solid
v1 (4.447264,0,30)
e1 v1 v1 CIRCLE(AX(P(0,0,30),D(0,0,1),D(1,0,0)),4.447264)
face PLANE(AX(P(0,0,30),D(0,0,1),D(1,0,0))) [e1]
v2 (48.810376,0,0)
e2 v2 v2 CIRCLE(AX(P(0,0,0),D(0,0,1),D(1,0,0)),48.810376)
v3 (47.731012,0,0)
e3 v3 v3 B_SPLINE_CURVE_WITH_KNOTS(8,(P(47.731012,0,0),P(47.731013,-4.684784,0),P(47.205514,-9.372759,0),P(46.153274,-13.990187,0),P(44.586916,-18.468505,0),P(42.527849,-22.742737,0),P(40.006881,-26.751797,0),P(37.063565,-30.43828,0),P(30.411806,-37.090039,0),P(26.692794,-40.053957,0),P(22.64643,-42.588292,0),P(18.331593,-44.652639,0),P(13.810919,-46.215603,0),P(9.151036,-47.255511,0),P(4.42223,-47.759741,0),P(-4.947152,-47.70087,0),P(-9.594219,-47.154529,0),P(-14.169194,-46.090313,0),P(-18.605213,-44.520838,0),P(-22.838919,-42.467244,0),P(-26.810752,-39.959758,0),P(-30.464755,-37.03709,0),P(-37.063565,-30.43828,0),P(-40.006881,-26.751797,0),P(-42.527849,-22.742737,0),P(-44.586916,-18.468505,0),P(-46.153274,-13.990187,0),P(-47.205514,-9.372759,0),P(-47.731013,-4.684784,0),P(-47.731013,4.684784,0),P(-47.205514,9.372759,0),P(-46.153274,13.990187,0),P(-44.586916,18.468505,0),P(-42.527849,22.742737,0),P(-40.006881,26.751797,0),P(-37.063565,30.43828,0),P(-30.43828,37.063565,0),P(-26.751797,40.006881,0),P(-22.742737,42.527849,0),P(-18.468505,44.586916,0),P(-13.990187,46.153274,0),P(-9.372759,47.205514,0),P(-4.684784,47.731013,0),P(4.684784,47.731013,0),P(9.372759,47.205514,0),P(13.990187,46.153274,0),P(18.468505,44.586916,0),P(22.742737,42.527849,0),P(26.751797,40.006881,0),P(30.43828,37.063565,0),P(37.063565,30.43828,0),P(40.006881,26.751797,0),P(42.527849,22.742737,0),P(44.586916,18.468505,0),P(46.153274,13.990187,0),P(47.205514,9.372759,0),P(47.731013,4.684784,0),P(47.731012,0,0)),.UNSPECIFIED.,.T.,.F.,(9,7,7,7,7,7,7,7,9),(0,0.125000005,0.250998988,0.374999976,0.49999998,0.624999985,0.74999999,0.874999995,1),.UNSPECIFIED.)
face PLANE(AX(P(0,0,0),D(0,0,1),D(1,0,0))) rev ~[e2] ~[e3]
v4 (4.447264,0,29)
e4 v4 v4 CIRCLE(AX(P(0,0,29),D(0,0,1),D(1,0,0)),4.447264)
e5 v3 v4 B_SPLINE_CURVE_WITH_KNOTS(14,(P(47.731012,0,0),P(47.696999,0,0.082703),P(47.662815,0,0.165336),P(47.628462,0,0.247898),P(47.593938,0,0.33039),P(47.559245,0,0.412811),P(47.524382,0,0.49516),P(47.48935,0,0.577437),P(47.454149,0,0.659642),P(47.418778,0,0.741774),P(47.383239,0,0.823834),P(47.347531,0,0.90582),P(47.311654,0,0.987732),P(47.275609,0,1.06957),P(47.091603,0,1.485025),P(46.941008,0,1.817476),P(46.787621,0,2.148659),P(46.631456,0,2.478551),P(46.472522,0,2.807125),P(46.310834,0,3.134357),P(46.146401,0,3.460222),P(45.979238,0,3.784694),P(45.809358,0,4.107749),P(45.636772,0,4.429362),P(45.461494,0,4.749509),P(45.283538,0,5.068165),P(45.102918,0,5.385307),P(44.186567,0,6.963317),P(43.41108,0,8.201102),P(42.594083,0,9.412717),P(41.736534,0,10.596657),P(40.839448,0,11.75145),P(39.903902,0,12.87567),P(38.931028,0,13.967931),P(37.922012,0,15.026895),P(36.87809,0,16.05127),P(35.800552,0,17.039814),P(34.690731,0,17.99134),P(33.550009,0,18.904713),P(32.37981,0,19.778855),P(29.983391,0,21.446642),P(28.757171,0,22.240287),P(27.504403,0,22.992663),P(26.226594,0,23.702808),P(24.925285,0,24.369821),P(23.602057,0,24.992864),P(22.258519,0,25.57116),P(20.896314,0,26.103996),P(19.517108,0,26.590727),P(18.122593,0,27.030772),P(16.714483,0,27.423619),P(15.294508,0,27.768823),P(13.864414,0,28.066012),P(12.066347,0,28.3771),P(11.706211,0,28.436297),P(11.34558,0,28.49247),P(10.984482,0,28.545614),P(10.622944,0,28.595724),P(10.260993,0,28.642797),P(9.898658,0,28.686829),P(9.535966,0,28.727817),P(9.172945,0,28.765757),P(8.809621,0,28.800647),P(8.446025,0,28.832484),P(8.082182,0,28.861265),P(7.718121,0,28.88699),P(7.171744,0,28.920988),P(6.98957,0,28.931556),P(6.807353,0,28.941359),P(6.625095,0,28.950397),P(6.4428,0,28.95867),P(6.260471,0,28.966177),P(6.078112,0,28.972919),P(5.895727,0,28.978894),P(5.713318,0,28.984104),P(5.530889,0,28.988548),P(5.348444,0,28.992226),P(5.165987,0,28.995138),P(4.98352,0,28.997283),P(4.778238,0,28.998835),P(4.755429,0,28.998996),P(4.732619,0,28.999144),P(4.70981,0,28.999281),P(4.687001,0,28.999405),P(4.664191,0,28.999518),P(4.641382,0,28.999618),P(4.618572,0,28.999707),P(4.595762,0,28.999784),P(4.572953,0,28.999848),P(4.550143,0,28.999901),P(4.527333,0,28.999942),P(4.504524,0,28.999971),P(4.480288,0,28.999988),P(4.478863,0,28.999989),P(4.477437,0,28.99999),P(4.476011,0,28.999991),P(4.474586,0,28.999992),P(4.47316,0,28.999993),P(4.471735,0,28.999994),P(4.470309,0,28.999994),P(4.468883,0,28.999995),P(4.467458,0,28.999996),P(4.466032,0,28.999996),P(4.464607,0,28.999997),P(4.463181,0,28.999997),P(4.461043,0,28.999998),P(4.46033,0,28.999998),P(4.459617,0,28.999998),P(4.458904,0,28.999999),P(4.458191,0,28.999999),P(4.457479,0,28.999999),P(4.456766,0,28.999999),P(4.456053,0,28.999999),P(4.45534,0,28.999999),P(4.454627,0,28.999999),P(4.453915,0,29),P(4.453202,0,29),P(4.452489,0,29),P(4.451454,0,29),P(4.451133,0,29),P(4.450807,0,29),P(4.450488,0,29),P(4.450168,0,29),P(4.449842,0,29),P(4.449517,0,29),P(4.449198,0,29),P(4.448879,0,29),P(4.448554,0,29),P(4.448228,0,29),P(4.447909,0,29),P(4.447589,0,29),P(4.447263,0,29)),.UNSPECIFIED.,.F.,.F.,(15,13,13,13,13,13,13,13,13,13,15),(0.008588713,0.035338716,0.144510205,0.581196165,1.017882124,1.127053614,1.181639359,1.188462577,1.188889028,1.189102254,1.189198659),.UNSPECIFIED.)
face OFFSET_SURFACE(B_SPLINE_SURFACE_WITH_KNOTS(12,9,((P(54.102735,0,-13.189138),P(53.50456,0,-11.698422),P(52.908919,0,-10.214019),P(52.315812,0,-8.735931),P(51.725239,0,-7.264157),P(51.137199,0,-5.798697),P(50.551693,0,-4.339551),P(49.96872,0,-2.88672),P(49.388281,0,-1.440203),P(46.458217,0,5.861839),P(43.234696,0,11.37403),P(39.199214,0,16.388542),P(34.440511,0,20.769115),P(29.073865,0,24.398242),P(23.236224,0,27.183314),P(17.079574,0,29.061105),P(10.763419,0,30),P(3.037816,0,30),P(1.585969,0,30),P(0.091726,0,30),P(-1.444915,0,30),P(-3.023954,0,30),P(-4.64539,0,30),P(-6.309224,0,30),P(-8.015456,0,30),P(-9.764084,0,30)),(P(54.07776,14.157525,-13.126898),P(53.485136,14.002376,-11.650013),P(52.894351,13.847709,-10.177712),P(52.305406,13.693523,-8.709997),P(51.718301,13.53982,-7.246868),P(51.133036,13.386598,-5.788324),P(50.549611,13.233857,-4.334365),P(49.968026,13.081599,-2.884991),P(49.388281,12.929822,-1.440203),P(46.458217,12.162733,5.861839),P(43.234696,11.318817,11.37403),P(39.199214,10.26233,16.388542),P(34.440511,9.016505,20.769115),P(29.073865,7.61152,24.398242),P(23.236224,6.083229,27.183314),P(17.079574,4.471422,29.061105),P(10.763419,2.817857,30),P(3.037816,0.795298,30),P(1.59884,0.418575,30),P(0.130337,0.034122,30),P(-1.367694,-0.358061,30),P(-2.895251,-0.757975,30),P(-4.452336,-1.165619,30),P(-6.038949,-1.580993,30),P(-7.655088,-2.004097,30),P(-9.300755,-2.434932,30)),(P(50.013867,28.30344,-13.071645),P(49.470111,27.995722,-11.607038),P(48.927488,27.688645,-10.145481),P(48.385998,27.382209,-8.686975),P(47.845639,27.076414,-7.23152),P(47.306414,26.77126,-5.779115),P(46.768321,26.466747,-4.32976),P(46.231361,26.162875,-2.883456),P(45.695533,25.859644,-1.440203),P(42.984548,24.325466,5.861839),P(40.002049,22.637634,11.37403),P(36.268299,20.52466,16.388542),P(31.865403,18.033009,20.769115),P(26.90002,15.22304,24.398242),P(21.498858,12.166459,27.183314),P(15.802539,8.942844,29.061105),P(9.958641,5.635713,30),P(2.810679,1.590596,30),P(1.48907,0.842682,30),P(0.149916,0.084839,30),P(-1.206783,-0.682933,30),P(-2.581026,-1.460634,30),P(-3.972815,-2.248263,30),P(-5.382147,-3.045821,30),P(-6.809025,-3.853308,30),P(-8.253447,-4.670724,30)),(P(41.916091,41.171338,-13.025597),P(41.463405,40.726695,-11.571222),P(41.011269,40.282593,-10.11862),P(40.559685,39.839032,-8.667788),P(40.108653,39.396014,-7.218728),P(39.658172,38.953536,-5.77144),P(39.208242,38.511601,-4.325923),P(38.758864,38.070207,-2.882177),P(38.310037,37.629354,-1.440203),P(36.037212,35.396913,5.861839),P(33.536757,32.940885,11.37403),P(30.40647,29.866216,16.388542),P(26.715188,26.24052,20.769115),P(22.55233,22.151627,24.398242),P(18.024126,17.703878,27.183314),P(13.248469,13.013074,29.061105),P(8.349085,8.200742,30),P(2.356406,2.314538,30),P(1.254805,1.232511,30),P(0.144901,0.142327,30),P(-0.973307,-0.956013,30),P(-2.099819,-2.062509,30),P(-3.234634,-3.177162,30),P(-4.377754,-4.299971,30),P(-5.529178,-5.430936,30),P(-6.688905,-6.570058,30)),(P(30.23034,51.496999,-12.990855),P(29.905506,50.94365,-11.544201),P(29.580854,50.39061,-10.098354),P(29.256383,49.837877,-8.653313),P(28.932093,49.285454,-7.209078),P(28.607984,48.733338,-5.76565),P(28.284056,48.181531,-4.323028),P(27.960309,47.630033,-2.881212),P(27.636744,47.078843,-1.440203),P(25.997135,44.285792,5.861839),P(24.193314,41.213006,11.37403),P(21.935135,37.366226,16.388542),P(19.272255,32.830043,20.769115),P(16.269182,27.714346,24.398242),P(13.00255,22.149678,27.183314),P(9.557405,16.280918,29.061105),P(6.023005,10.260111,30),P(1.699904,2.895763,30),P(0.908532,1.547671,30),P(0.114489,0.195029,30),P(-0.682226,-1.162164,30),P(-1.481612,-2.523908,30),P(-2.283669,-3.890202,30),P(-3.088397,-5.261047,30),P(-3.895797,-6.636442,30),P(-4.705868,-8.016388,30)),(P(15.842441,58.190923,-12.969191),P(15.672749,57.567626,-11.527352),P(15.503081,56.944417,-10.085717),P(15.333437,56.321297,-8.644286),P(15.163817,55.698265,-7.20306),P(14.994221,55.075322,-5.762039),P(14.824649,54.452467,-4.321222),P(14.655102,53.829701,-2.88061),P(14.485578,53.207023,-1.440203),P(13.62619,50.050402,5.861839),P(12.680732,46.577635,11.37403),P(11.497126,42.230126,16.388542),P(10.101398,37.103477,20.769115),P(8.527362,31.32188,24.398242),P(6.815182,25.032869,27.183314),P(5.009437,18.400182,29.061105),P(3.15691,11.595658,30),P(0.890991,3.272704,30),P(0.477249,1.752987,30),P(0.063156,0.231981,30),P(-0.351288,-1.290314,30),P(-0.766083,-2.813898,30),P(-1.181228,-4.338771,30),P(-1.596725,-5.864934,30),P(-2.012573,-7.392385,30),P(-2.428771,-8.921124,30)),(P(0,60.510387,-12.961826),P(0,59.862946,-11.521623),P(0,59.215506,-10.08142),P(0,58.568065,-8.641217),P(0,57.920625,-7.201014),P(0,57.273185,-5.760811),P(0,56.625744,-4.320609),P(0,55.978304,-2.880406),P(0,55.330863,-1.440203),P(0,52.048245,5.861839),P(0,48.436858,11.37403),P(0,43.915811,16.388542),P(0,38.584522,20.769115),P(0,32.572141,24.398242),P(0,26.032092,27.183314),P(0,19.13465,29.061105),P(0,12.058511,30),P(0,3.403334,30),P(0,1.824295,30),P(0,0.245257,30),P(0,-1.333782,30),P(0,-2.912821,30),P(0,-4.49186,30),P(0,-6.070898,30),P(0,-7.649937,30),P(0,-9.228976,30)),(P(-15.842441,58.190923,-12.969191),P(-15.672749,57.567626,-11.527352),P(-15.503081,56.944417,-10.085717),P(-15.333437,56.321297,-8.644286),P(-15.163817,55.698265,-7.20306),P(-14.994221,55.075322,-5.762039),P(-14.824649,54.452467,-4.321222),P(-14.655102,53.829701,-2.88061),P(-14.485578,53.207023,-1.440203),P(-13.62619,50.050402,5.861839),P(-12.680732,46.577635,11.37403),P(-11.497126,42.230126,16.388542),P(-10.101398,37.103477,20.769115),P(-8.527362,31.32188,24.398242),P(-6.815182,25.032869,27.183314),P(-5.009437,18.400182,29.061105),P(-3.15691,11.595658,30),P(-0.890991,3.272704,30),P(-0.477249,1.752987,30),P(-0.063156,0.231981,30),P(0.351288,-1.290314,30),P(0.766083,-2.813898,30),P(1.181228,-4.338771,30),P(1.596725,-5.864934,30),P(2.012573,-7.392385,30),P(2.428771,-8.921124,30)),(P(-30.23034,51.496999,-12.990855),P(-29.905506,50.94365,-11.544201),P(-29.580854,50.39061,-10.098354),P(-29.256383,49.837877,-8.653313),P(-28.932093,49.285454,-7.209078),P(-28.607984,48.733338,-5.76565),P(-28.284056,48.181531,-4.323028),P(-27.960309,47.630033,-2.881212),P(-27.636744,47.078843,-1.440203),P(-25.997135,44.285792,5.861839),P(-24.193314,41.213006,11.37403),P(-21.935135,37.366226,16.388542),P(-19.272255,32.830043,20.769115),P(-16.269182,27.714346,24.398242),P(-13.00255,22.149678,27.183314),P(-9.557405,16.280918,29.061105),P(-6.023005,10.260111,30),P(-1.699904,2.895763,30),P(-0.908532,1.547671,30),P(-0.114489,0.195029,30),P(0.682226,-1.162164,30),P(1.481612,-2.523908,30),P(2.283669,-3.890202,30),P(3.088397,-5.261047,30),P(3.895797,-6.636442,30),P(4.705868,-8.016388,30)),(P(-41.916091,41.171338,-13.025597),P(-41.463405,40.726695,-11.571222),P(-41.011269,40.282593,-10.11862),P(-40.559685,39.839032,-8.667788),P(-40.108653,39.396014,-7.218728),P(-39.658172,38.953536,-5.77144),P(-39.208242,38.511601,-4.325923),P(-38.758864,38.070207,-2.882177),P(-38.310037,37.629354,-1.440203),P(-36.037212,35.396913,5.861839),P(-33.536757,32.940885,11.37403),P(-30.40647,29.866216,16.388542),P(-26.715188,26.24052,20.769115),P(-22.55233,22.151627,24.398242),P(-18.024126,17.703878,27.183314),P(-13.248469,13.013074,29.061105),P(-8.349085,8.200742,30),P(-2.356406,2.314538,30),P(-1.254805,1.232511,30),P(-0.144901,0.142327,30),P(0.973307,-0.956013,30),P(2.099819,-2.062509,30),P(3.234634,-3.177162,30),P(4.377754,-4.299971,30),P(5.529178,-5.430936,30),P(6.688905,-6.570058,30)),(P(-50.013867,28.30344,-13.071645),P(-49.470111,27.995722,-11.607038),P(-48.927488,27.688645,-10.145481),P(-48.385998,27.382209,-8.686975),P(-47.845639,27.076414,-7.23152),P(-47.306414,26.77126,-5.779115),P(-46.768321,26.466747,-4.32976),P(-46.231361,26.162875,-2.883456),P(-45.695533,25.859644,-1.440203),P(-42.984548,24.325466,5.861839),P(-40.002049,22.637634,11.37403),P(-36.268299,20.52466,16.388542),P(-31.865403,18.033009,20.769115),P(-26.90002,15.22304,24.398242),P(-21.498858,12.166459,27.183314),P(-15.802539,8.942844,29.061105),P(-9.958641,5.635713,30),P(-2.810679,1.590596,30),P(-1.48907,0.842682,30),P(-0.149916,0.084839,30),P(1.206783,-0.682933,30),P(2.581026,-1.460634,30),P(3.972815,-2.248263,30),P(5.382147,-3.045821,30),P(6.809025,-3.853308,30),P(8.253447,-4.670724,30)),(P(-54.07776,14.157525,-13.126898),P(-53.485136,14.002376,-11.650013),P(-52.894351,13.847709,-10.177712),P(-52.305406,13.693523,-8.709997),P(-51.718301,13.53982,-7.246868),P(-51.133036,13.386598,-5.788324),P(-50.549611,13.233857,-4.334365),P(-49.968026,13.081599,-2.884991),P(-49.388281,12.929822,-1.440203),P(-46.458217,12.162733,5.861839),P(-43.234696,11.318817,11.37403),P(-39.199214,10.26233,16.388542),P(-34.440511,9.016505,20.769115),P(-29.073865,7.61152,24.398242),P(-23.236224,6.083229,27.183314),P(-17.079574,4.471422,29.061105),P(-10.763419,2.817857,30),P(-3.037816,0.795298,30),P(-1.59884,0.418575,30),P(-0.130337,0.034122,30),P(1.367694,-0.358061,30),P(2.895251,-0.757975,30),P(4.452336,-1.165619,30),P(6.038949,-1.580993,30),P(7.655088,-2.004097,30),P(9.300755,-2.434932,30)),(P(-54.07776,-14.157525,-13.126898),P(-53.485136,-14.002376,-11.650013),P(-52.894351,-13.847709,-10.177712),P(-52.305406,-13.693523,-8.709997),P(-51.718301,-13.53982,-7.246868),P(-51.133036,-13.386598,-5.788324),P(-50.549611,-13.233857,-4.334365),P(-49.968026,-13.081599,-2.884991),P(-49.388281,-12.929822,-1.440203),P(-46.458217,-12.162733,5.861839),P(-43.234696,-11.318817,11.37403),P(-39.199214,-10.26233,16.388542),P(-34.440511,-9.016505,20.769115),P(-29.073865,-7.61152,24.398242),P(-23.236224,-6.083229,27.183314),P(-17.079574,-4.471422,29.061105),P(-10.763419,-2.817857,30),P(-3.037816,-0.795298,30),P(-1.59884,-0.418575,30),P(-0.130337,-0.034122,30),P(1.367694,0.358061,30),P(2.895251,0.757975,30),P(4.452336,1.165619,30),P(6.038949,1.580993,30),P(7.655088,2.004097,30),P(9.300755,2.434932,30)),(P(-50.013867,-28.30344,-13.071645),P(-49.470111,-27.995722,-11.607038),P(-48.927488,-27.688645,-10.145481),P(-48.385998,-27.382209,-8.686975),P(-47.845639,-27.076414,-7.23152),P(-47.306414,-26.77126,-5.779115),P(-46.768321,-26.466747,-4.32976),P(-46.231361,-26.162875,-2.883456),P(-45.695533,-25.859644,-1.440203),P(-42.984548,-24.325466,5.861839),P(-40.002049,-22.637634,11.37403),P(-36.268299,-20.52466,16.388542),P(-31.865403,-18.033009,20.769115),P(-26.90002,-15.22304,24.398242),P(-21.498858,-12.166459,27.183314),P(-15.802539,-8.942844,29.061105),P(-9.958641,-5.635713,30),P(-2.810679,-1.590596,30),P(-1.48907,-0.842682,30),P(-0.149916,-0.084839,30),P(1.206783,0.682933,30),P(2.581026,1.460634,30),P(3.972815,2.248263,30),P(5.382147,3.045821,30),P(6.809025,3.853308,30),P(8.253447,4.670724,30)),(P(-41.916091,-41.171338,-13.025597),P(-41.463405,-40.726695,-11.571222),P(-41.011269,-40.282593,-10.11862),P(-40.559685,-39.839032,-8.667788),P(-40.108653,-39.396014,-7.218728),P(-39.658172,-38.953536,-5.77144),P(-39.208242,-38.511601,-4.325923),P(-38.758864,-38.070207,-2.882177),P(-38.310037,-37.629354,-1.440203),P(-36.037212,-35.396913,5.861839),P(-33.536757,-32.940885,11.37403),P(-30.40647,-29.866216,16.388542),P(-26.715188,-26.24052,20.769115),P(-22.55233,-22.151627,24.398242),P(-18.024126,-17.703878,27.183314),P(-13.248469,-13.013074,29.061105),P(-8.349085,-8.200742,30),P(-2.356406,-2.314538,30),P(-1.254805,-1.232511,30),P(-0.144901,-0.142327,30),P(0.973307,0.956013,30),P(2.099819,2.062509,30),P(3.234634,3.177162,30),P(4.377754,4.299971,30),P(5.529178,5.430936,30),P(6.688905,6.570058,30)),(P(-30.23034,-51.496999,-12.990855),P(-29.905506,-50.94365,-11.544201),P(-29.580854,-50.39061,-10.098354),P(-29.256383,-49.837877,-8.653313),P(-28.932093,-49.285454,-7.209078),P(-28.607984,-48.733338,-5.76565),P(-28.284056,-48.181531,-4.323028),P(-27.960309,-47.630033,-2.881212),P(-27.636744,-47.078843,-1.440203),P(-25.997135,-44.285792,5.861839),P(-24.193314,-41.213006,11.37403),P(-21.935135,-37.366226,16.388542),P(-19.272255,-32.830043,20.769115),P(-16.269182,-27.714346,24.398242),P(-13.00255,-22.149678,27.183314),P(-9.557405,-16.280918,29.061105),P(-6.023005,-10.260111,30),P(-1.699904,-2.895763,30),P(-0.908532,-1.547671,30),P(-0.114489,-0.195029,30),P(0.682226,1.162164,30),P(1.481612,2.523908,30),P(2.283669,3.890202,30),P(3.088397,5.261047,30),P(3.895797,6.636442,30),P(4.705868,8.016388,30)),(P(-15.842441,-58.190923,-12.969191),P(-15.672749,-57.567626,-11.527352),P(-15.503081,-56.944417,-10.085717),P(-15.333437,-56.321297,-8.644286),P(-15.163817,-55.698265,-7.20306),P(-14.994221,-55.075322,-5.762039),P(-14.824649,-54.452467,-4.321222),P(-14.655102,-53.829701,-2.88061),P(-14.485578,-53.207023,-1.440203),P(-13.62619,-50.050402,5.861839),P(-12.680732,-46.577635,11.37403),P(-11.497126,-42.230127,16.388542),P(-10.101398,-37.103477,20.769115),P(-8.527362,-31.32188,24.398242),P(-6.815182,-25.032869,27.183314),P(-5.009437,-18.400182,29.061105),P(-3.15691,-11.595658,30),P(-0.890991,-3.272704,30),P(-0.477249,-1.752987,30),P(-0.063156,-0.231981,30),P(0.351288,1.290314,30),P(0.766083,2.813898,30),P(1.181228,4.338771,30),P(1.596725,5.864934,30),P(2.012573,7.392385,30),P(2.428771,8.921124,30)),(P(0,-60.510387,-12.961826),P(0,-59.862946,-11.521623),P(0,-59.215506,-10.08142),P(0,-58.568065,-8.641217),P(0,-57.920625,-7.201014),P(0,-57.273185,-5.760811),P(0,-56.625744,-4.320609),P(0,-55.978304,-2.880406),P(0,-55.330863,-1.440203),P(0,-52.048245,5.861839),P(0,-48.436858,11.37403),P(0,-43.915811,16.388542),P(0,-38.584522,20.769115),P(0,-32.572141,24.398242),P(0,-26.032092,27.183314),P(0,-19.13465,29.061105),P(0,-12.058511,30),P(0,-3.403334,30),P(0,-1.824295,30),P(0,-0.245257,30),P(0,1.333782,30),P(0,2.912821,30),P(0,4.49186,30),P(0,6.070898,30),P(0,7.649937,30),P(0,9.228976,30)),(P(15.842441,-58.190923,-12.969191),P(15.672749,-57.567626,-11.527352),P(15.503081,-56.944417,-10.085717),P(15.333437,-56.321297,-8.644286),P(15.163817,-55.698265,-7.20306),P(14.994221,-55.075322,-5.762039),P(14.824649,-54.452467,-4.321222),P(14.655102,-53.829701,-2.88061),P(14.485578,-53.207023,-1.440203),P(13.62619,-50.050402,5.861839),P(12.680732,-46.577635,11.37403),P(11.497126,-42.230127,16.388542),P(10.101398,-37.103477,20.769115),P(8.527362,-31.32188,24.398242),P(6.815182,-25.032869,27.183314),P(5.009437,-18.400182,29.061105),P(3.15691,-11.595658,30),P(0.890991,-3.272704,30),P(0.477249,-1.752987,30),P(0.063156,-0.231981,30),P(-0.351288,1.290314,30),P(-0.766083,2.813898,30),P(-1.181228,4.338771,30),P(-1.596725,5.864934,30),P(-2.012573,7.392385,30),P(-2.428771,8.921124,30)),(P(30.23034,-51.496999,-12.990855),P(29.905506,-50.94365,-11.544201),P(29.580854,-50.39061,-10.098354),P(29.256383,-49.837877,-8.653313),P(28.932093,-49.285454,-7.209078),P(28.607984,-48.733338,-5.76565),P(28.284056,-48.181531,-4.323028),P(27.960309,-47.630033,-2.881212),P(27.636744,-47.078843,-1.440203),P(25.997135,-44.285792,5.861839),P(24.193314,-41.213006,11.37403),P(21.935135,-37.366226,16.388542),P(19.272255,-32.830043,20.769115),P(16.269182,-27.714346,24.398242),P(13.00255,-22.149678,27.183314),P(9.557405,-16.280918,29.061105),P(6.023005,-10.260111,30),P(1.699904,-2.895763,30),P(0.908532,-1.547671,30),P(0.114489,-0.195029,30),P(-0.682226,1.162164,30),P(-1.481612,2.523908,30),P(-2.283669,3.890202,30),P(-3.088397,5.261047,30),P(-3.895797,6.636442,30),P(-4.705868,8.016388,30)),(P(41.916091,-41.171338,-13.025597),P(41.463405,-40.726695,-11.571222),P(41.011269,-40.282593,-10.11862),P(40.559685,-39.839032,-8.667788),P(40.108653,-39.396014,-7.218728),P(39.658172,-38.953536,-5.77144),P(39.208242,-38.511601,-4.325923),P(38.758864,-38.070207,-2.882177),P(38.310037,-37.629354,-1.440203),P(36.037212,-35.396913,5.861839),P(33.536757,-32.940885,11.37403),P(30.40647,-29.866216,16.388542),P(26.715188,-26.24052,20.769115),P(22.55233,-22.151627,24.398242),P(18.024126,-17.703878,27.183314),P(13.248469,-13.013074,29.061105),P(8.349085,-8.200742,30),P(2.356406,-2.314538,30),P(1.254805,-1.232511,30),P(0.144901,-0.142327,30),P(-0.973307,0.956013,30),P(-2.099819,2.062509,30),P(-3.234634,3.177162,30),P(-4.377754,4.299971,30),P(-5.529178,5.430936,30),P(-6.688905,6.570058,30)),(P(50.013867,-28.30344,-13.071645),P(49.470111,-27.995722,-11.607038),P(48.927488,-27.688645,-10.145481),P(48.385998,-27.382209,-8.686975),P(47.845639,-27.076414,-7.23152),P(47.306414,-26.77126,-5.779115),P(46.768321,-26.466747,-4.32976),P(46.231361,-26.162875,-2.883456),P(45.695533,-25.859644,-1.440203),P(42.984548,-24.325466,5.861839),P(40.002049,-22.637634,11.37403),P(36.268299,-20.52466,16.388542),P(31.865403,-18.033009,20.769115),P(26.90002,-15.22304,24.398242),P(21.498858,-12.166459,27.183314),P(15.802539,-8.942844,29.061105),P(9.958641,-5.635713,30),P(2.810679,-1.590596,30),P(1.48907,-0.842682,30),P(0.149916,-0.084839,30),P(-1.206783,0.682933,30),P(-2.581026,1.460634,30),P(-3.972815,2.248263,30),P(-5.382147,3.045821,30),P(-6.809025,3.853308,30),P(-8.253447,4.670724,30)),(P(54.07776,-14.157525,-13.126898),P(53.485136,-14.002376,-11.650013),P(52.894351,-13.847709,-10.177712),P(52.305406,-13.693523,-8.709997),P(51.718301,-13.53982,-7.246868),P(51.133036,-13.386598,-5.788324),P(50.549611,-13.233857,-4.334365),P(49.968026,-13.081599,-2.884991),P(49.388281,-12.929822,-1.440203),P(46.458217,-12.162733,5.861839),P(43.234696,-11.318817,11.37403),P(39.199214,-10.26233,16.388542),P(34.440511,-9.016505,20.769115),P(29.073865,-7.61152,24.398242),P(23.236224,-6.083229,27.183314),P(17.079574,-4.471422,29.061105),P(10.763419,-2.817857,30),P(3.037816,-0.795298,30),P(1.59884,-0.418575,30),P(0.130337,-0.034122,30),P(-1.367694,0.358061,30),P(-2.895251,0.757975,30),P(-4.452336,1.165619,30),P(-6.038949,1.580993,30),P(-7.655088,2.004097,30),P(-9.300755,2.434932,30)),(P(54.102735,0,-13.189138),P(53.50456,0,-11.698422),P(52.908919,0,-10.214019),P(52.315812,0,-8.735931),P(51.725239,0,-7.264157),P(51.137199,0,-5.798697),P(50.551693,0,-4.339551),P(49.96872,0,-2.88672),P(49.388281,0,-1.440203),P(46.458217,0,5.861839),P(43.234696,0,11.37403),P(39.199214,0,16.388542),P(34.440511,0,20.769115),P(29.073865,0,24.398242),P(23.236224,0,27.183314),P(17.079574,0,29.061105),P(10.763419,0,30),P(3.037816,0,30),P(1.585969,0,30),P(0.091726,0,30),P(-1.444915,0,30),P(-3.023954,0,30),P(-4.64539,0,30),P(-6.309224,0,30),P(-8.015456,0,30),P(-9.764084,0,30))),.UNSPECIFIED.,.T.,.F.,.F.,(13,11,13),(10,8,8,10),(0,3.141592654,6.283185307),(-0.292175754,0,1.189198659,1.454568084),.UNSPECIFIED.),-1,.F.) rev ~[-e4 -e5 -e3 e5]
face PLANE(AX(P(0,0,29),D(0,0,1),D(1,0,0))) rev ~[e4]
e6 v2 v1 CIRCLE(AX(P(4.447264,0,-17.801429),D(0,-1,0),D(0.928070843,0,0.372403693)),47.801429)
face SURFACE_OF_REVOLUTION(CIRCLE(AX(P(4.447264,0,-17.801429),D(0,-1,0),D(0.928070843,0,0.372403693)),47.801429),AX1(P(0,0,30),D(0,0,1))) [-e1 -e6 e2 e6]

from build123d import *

# Parameters (mm, degrees)
F0_R     = 48.8103763307
F1_DEPTH = 30
F3_T     = -1


# Not quite as in the source:
# - a fillet or chamfer that OpenCascade refuses, or shapes differently, is made with other operations: its cross-section is extruded or revolved along the edge and cut away or added


with BuildPart() as f1:
    # F0 (on Top) → F1 (new body)
    with BuildSketch(Plane.XY):
        Circle(F0_R)
    extrude(amount=F1_DEPTH)

    # F2: fillet of radius 47.801428535 on 1 edges, made by hand

    # F2_s1 → F2_t2 (revolve, cut)
    with BuildSketch(Plane.XZ):
        with BuildLine():
            ThreePointArc((48.8103763307, 0), (31.2245200627, 21.7959847891), (4.4472642656, 30))
            Line((4.4472642656, 30), (4.4472642656, 30.9560285707))
            Line((4.4472642656, 30.9560285707), (48.8103763307, 30.9560285707))
            Line((48.8103763307, 30.9560285707), (49.7664049014, 30))
            ThreePointArc((49.7664049014, 30), (49.7664049014, 15), (49.697638572, 0.3560285707))
            Line((49.697638572, 0.3560285707), (48.8103763307, 0))
        make_face()
    revolve(axis=Axis((0, 0, 30), (0, 0, 1)), mode=Mode.SUBTRACT)

    # F3
    f3_openings = [f1.faces().sort_by_distance(p)[0] for p in [
        (0, 0, 0),
    ]]
    offset(amount=F3_T, openings=f3_openings)


solid = f1.part
